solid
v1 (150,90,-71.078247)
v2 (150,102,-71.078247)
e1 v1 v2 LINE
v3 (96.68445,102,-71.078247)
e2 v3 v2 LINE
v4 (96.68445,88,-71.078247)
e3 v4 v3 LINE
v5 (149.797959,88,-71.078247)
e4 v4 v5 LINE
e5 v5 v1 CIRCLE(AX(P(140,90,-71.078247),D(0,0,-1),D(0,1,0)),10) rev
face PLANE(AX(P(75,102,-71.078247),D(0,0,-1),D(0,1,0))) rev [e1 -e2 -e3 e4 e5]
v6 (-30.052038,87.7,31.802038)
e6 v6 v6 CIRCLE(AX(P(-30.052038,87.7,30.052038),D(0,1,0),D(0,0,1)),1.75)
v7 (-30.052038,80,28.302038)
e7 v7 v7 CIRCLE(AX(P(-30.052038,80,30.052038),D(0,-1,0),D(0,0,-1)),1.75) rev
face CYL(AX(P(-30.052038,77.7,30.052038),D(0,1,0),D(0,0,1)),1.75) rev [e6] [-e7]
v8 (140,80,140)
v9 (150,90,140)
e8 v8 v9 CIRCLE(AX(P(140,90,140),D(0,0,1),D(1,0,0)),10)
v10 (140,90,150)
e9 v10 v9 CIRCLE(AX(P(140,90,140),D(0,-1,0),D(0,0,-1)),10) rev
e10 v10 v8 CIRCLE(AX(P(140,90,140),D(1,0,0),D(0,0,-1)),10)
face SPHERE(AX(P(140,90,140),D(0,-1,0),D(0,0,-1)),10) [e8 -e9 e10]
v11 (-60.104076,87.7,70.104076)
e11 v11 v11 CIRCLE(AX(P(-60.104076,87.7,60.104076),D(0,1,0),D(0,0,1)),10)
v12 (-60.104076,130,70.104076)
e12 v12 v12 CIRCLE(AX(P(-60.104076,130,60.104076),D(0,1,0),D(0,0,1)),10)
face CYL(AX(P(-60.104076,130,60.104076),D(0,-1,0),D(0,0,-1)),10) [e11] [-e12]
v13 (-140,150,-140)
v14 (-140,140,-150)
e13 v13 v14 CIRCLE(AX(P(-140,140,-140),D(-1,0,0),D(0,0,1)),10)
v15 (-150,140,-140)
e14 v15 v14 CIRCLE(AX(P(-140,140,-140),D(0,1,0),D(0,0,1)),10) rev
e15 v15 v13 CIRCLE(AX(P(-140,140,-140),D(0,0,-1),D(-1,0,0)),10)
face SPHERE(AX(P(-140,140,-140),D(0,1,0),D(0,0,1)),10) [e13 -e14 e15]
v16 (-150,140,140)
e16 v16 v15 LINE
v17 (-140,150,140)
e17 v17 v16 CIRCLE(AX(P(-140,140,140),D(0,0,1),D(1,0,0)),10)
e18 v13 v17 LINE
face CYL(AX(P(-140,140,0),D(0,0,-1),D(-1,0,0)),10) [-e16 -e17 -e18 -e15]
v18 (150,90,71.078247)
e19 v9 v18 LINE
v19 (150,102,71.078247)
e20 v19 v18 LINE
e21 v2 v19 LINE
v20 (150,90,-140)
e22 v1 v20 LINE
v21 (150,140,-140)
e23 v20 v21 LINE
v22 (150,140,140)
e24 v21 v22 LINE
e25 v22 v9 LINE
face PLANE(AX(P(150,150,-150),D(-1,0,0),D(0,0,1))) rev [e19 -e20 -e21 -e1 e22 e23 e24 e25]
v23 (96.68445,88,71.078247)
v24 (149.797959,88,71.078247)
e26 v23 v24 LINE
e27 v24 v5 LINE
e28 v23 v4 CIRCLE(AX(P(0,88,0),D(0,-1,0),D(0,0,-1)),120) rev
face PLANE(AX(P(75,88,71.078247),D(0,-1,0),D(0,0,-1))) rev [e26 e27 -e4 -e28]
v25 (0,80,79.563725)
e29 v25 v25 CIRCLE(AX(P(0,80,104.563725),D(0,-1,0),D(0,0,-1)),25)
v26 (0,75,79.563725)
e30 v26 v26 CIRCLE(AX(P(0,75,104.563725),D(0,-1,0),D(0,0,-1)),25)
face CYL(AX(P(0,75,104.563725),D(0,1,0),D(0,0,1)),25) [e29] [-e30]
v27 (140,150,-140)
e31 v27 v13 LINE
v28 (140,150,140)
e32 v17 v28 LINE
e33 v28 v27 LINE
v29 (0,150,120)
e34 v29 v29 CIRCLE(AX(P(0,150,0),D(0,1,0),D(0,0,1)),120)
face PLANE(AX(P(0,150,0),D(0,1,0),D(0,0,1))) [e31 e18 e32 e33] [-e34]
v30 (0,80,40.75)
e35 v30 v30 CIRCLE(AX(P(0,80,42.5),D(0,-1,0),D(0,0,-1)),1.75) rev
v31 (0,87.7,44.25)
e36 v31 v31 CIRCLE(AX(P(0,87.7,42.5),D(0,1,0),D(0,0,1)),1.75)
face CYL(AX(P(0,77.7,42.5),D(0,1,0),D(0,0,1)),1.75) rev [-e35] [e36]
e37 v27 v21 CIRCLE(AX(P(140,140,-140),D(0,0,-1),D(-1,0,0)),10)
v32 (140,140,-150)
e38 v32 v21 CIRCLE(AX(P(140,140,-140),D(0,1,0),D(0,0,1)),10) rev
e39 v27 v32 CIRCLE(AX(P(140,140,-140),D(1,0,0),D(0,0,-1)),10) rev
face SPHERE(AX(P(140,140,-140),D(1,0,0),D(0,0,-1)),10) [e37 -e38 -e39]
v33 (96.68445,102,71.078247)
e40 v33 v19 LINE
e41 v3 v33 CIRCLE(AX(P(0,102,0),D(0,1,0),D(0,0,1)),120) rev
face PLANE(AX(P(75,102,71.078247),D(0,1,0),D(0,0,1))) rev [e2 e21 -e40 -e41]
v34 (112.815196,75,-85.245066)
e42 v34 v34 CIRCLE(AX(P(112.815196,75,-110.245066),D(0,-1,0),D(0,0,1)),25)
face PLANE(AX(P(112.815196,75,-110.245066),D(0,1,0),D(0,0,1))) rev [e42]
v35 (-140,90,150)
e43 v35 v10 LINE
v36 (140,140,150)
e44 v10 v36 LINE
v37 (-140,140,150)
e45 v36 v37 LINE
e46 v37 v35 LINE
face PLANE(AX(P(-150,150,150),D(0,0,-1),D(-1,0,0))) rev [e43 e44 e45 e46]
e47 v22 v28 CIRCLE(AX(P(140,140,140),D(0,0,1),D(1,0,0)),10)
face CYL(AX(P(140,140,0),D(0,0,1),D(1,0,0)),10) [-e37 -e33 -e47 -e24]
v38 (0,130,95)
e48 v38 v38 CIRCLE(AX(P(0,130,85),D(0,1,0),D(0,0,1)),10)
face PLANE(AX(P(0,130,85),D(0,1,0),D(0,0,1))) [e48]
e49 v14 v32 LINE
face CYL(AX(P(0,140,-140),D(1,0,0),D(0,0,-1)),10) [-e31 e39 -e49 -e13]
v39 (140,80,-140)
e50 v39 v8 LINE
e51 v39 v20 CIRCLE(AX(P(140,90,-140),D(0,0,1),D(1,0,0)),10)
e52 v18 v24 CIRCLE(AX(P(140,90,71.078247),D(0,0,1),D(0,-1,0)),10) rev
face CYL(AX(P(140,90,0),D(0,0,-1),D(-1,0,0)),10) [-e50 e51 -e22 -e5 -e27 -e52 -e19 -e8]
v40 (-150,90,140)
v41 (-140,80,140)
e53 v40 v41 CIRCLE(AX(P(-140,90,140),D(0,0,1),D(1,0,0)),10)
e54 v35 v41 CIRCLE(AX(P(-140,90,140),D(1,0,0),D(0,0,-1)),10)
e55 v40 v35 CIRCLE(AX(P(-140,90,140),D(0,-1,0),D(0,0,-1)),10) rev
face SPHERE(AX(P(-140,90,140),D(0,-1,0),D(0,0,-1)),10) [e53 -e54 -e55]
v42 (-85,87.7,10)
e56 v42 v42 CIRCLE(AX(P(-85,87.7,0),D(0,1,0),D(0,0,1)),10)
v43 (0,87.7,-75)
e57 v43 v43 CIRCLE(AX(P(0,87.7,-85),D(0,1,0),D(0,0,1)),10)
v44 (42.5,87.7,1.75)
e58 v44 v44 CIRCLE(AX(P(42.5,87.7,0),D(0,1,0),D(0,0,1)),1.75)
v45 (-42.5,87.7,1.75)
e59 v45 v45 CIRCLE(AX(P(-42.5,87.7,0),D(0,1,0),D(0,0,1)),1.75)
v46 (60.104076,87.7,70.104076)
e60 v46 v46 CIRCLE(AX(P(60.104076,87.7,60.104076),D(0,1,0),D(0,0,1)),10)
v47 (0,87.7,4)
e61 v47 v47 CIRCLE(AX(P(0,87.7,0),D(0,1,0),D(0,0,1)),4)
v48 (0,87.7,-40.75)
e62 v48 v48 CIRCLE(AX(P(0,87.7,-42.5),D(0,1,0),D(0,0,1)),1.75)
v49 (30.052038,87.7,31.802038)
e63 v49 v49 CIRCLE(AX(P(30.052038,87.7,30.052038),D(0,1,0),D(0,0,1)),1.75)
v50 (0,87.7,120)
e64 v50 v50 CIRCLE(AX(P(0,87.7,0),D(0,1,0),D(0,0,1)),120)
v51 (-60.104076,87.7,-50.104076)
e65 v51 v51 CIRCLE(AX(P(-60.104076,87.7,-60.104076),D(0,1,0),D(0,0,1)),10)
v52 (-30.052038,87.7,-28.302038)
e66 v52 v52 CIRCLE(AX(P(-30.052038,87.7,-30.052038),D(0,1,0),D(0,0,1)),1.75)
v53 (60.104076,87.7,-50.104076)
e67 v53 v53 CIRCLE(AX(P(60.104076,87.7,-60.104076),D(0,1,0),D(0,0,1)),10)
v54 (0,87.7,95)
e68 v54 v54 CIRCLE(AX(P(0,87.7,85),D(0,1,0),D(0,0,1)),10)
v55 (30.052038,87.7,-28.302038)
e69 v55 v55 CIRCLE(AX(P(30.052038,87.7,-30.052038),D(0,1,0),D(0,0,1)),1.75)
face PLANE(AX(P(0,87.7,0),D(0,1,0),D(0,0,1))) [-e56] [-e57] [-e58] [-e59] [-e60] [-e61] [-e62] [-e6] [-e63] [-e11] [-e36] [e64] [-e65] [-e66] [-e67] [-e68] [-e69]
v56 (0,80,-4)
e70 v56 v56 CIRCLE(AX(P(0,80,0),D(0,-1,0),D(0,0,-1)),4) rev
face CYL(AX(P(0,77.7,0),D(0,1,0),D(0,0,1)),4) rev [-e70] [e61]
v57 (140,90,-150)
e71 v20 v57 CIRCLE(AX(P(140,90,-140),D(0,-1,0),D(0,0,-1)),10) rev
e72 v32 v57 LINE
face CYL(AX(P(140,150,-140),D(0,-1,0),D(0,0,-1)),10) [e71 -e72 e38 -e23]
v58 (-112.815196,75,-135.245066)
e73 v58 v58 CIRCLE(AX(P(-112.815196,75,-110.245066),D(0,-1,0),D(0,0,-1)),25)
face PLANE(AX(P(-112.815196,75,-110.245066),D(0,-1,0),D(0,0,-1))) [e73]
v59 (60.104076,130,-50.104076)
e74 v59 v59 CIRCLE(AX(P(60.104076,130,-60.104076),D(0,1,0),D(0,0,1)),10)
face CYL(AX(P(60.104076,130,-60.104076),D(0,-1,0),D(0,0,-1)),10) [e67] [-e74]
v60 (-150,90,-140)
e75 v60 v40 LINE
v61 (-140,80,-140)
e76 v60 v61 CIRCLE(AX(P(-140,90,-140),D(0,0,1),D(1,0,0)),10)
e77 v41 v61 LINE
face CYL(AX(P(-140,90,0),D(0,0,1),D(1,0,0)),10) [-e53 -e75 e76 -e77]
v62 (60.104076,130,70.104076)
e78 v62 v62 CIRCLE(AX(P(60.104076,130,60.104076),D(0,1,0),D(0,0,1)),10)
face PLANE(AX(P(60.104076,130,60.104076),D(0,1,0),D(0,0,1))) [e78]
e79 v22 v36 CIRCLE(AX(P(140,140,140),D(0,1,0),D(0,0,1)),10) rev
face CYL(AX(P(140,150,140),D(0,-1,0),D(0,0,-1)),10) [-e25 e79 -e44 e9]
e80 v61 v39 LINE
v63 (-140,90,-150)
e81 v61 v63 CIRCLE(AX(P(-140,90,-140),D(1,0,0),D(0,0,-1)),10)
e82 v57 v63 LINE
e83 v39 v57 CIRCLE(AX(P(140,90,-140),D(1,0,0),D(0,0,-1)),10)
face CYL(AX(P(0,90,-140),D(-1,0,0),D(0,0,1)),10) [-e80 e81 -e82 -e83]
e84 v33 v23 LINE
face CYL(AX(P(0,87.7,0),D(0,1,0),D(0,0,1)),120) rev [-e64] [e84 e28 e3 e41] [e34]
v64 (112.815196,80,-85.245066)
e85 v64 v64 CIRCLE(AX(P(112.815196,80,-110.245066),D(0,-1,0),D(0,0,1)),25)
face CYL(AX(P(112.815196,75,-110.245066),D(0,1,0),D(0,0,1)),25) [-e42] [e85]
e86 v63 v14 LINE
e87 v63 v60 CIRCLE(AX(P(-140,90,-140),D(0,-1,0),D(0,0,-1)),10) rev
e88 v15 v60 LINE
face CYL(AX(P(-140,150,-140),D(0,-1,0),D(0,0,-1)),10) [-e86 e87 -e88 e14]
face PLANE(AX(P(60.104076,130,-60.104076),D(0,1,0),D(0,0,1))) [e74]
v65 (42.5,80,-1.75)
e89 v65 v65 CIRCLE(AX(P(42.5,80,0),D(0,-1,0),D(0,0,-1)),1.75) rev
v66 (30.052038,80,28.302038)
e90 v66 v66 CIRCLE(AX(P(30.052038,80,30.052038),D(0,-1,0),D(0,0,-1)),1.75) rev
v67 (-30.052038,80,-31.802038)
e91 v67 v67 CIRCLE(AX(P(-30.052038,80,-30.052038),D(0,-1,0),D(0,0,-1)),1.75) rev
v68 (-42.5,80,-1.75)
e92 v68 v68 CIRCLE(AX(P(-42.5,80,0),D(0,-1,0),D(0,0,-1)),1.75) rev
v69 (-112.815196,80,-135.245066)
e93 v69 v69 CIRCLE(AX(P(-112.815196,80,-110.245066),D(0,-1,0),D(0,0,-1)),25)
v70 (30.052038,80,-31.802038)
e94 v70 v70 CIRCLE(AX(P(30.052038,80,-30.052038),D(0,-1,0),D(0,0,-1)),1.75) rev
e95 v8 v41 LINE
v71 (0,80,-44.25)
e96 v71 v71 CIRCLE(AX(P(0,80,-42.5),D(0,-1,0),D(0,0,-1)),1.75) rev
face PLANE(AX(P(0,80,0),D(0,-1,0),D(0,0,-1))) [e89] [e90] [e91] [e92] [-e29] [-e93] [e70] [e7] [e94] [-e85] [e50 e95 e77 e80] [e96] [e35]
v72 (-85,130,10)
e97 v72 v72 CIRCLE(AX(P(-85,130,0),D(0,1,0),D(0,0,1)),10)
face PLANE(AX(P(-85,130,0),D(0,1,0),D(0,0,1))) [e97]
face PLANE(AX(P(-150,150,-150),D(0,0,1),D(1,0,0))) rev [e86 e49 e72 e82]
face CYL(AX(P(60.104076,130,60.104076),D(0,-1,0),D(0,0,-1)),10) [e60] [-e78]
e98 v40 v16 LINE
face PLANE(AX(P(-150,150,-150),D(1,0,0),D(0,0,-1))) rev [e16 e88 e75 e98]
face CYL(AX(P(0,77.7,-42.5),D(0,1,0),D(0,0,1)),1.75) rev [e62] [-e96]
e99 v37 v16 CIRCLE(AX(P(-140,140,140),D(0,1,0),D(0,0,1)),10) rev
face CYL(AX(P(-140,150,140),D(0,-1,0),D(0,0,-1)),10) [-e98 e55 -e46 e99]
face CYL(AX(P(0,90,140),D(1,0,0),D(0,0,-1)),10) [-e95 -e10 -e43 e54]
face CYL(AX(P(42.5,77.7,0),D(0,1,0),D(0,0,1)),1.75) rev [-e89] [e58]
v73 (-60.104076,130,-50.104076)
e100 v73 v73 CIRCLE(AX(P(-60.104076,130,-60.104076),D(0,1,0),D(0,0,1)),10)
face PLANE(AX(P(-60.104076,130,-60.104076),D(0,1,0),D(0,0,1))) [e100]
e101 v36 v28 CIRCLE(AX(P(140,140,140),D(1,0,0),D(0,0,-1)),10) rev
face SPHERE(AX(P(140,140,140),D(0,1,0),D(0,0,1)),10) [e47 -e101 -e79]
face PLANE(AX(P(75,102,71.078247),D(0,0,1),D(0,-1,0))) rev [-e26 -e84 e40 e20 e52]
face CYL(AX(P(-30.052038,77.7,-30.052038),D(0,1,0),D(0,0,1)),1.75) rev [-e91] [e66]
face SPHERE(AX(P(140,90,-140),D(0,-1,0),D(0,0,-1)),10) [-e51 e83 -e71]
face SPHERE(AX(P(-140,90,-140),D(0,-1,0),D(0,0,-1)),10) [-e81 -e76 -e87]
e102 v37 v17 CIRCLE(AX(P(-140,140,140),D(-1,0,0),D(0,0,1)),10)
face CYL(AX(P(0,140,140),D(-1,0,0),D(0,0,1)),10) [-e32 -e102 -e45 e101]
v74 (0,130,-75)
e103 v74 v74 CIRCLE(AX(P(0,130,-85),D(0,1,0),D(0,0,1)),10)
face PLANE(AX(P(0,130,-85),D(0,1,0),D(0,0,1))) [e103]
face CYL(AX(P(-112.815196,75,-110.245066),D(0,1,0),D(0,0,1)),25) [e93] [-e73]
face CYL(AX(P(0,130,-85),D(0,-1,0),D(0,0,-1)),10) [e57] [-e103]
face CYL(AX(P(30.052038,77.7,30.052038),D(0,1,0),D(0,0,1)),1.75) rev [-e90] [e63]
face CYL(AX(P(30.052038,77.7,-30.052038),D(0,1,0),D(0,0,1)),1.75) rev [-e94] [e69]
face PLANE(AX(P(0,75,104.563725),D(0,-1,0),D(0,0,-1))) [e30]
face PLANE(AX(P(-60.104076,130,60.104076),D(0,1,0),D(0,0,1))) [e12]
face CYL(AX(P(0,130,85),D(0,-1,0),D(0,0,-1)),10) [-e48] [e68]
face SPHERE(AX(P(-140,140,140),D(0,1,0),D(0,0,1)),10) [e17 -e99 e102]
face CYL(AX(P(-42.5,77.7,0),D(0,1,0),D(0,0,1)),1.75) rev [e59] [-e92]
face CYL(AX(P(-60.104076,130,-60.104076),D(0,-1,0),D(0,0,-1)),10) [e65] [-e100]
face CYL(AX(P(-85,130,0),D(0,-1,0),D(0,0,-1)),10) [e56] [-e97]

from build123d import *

# Parameters (mm, degrees)
SKETCH_1_W          = 300
SKETCH_1_H          = 300
EXTRUDE_1_DEPTH     = 150
SKETCH_2_R          = 120
CUT_EXTRUDE_1_DEPTH = 62.3
SKETCH_3_R          = 1.75
SKETCH_3_R_2        = 4
CUT_EXTRUDE_2_DEPTH = 10
SKETCH_6_W          = 142.15649329
SKETCH_6_H          = 14
CUT_EXTRUDE_4_DEPTH = 75
SKETCH_11_R         = 10
EXTRUDE_4_DEPTH     = 42.3
FILLET_1_R          = 10
SKETCH_13_W         = 300
SKETCH_13_H         = 300
CUT_EXTRUDE_5_DEPTH = 80
SKETCH_14_R         = 25
EXTRUDE_5_DEPTH     = 5
FILLET_2_R          = 10


with BuildPart() as part:
    # 草图1 → 凸台-拉伸1 (new body)
    with BuildSketch(Plane(origin=(0, 0, 0), x_dir=(1, 0, 0), z_dir=(0, 1, 0))):
        Rectangle(SKETCH_1_W, SKETCH_1_H)
    extrude(amount=EXTRUDE_1_DEPTH)

    # 草图2 → 切除-拉伸1 (cut)
    with BuildSketch(Plane(origin=(0, 150, 0), x_dir=(1, 0, 0), z_dir=(0, 1, 0))):
        with Locations(Location((0, 0, 0), (0, 0, 270))):
            Circle(SKETCH_2_R)
    extrude(amount=-CUT_EXTRUDE_1_DEPTH, mode=Mode.SUBTRACT)

    # 草图3 → 切除-拉伸2 (cut)
    with BuildSketch(Plane(origin=(0, 87.7, 0), x_dir=(1, 0, 0), z_dir=(0, 1, 0))):
        with Locations(Location((42.5, 0, 0), (0, 0, 270))):
            Circle(SKETCH_3_R)
        with Locations(Location((30.0520382, -30.0520382, 0), (0, 0, 270))):
            Circle(SKETCH_3_R)
        with Locations(Location((0, -42.5, 0), (0, 0, 270))):
            Circle(SKETCH_3_R)
        with Locations(Location((-30.0520382, -30.0520382, 0), (0, 0, 270))):
            Circle(SKETCH_3_R)
        with Locations(Location((-42.5, 0, 0), (0, 0, 270))):
            Circle(SKETCH_3_R)
        with Locations(Location((-30.0520382, 30.0520382, 0), (0, 0, 270))):
            Circle(SKETCH_3_R)
        with Locations(Location((0, 42.5, 0), (0, 0, 270))):
            Circle(SKETCH_3_R)
        with Locations(Location((30.0520382, 30.0520382, 0), (0, 0, 270))):
            Circle(SKETCH_3_R)
        with Locations(Location((0, 0, 0), (0, 0, 270))):
            Circle(SKETCH_3_R_2)
    extrude(amount=-CUT_EXTRUDE_2_DEPTH, mode=Mode.SUBTRACT)

    # 草图6 → 切除-拉伸4 (cut)
    with BuildSketch(Plane(origin=(150, 0, 0), x_dir=(0, 0, -1), z_dir=(1, 0, 0))):
        with Locations((0, 95)):
            Rectangle(SKETCH_6_W, SKETCH_6_H)
    extrude(amount=-CUT_EXTRUDE_4_DEPTH, mode=Mode.SUBTRACT)

    # 草图11 → 凸台-拉伸4 (add)
    with BuildSketch(Plane(origin=(0, 87.7, 0), x_dir=(1, 0, 0), z_dir=(0, 1, 0))):
        with Locations(Location((-85, 0, 0), (0, 0, 270))):
            Circle(SKETCH_11_R)
        with Locations(Location((-60.104076401, 60.104076401, 0), (0, 0, 270))):
            Circle(SKETCH_11_R)
        with Locations(Location((0, 85, 0), (0, 0, 270))):
            Circle(SKETCH_11_R)
        with Locations(Location((60.104076401, 60.104076401, 0), (0, 0, 270))):
            Circle(SKETCH_11_R)
        with Locations(Location((60.104076401, -60.104076401, 0), (0, 0, 270))):
            Circle(SKETCH_11_R)
        with Locations(Location((0, -85, 0), (0, 0, 270))):
            Circle(SKETCH_11_R)
        with Locations(Location((-60.104076401, -60.104076401, 0), (0, 0, 270))):
            Circle(SKETCH_11_R)
    extrude(amount=EXTRUDE_4_DEPTH)

    # 圆角1
    fillet_1_edges = [part.edges().sort_by_distance(p)[0] for p in [
        (-150, 150, 0),
        (0, 150, 150),
        (150, 150, 0),
        (0, 0, 150),
        (-150, 0, 0),
        (0, 0, -150),
        (150, 0, 0),
        (150, 75, 150),
        (-150, 75, 150),
        (-150, 75, -150),
        (150, 75, -150),
        (0, 150, -150),
    ]]
    fillet(fillet_1_edges, radius=FILLET_1_R)

    # 草图13 → 切除-拉伸5 (cut)
    with BuildSketch(Plane.XZ):
        Rectangle(SKETCH_13_W, SKETCH_13_H)
    extrude(amount=-CUT_EXTRUDE_5_DEPTH, mode=Mode.SUBTRACT)

    # 草图14 → 凸台-拉伸5 (add)
    with BuildSketch(Plane.XZ.offset(-80)):
        with Locations(Location((0, 104.563725125, 0), (0, 0, 270))):
            Circle(SKETCH_14_R)
        with Locations(Location((-112.815196319, -110.245065947, 0), (0, 0, 270))):
            Circle(SKETCH_14_R)
        with Locations(Location((112.815196319, -110.245065947, 0), (0, 0, 90))):
            Circle(SKETCH_14_R)
    extrude(amount=EXTRUDE_5_DEPTH)

    # 圆角2
    # the kernel refuses this fillet: 10 mm, written as the material it takes off along each edge
    with BuildSketch(Plane(origin=(140, 80, 140), x_dir=(0, 0, 1), z_dir=(-1, 0, 0))) as fillet_2_piece_1:
        with BuildLine():
            CenterArc((10 - FILLET_2_R, FILLET_2_R), FILLET_2_R, 270, 90)
            Line((10, FILLET_2_R), (10, 0))
            Line((10, 0), (10 - FILLET_2_R, 0))
        make_face()
    revolve(axis=Axis((140, 80, 140), (0, 1, 0)), revolution_arc=90, mode=Mode.SUBTRACT)
    with BuildSketch(Plane(origin=(140, 80, -140), x_dir=(1, 0, 0), z_dir=(0, 0, 1))) as fillet_2_piece_2:
        with BuildLine():
            CenterArc((10 - FILLET_2_R, FILLET_2_R), FILLET_2_R, 270, 90)
            Line((10, FILLET_2_R), (10, 0))
            Line((10, 0), (10 - FILLET_2_R, 0))
        make_face()
    revolve(axis=Axis((140, 80, -140), (0, 1, 0)), revolution_arc=90, mode=Mode.SUBTRACT)
    with BuildSketch(Plane(origin=(-140, 80, -140), x_dir=(0, 0, -1), z_dir=(1, 0, 0))) as fillet_2_piece_3:
        with BuildLine():
            CenterArc((10 - FILLET_2_R, FILLET_2_R), FILLET_2_R, 270, 90)
            Line((10, FILLET_2_R), (10, 0))
            Line((10, 0), (10 - FILLET_2_R, 0))
        make_face()
    revolve(axis=Axis((-140, 80, -140), (0, 1, 0)), revolution_arc=90, mode=Mode.SUBTRACT)
    with BuildSketch(Plane(origin=(-140, 80, 140), x_dir=(-1, 0, 0), z_dir=(0, 0, -1))) as fillet_2_piece_4:
        with BuildLine():
            CenterArc((10 - FILLET_2_R, FILLET_2_R), FILLET_2_R, 270, 90)
            Line((10, FILLET_2_R), (10, 0))
            Line((10, 0), (10 - FILLET_2_R, 0))
        make_face()
    revolve(axis=Axis((-140, 80, 140), (0, 1, 0)), revolution_arc=90, mode=Mode.SUBTRACT)
    with BuildSketch(Plane(origin=(-150, 80, -140), x_dir=(1, 0, 0), z_dir=(0, 0, 1)), Plane(origin=(150, 80, 140), x_dir=(-1, 0, 0), z_dir=(0, 0, -1)), Plane(origin=(-140, 80, 150), x_dir=(0, 0, -1), z_dir=(1, 0, 0))) as fillet_2_piece_5:
        with BuildLine():
            CenterArc((FILLET_2_R, FILLET_2_R), FILLET_2_R, 180, 90)
            Line((0, FILLET_2_R), (0, 0))
            Line((0, 0), (FILLET_2_R, 0))
        make_face()
    extrude(amount=280, mode=Mode.SUBTRACT)
    with BuildSketch(Plane(origin=(140, 80, -150), x_dir=(0, 1, 0), z_dir=(-1, 0, 0))) as fillet_2_piece_6:
        with BuildLine():
            CenterArc((FILLET_2_R, -FILLET_2_R), FILLET_2_R, 90, 90)
            Line((0, -FILLET_2_R), (0, 0))
            Line((0, 0), (FILLET_2_R, 0))
        make_face()
    extrude(amount=280, mode=Mode.SUBTRACT)


solid = part.part
